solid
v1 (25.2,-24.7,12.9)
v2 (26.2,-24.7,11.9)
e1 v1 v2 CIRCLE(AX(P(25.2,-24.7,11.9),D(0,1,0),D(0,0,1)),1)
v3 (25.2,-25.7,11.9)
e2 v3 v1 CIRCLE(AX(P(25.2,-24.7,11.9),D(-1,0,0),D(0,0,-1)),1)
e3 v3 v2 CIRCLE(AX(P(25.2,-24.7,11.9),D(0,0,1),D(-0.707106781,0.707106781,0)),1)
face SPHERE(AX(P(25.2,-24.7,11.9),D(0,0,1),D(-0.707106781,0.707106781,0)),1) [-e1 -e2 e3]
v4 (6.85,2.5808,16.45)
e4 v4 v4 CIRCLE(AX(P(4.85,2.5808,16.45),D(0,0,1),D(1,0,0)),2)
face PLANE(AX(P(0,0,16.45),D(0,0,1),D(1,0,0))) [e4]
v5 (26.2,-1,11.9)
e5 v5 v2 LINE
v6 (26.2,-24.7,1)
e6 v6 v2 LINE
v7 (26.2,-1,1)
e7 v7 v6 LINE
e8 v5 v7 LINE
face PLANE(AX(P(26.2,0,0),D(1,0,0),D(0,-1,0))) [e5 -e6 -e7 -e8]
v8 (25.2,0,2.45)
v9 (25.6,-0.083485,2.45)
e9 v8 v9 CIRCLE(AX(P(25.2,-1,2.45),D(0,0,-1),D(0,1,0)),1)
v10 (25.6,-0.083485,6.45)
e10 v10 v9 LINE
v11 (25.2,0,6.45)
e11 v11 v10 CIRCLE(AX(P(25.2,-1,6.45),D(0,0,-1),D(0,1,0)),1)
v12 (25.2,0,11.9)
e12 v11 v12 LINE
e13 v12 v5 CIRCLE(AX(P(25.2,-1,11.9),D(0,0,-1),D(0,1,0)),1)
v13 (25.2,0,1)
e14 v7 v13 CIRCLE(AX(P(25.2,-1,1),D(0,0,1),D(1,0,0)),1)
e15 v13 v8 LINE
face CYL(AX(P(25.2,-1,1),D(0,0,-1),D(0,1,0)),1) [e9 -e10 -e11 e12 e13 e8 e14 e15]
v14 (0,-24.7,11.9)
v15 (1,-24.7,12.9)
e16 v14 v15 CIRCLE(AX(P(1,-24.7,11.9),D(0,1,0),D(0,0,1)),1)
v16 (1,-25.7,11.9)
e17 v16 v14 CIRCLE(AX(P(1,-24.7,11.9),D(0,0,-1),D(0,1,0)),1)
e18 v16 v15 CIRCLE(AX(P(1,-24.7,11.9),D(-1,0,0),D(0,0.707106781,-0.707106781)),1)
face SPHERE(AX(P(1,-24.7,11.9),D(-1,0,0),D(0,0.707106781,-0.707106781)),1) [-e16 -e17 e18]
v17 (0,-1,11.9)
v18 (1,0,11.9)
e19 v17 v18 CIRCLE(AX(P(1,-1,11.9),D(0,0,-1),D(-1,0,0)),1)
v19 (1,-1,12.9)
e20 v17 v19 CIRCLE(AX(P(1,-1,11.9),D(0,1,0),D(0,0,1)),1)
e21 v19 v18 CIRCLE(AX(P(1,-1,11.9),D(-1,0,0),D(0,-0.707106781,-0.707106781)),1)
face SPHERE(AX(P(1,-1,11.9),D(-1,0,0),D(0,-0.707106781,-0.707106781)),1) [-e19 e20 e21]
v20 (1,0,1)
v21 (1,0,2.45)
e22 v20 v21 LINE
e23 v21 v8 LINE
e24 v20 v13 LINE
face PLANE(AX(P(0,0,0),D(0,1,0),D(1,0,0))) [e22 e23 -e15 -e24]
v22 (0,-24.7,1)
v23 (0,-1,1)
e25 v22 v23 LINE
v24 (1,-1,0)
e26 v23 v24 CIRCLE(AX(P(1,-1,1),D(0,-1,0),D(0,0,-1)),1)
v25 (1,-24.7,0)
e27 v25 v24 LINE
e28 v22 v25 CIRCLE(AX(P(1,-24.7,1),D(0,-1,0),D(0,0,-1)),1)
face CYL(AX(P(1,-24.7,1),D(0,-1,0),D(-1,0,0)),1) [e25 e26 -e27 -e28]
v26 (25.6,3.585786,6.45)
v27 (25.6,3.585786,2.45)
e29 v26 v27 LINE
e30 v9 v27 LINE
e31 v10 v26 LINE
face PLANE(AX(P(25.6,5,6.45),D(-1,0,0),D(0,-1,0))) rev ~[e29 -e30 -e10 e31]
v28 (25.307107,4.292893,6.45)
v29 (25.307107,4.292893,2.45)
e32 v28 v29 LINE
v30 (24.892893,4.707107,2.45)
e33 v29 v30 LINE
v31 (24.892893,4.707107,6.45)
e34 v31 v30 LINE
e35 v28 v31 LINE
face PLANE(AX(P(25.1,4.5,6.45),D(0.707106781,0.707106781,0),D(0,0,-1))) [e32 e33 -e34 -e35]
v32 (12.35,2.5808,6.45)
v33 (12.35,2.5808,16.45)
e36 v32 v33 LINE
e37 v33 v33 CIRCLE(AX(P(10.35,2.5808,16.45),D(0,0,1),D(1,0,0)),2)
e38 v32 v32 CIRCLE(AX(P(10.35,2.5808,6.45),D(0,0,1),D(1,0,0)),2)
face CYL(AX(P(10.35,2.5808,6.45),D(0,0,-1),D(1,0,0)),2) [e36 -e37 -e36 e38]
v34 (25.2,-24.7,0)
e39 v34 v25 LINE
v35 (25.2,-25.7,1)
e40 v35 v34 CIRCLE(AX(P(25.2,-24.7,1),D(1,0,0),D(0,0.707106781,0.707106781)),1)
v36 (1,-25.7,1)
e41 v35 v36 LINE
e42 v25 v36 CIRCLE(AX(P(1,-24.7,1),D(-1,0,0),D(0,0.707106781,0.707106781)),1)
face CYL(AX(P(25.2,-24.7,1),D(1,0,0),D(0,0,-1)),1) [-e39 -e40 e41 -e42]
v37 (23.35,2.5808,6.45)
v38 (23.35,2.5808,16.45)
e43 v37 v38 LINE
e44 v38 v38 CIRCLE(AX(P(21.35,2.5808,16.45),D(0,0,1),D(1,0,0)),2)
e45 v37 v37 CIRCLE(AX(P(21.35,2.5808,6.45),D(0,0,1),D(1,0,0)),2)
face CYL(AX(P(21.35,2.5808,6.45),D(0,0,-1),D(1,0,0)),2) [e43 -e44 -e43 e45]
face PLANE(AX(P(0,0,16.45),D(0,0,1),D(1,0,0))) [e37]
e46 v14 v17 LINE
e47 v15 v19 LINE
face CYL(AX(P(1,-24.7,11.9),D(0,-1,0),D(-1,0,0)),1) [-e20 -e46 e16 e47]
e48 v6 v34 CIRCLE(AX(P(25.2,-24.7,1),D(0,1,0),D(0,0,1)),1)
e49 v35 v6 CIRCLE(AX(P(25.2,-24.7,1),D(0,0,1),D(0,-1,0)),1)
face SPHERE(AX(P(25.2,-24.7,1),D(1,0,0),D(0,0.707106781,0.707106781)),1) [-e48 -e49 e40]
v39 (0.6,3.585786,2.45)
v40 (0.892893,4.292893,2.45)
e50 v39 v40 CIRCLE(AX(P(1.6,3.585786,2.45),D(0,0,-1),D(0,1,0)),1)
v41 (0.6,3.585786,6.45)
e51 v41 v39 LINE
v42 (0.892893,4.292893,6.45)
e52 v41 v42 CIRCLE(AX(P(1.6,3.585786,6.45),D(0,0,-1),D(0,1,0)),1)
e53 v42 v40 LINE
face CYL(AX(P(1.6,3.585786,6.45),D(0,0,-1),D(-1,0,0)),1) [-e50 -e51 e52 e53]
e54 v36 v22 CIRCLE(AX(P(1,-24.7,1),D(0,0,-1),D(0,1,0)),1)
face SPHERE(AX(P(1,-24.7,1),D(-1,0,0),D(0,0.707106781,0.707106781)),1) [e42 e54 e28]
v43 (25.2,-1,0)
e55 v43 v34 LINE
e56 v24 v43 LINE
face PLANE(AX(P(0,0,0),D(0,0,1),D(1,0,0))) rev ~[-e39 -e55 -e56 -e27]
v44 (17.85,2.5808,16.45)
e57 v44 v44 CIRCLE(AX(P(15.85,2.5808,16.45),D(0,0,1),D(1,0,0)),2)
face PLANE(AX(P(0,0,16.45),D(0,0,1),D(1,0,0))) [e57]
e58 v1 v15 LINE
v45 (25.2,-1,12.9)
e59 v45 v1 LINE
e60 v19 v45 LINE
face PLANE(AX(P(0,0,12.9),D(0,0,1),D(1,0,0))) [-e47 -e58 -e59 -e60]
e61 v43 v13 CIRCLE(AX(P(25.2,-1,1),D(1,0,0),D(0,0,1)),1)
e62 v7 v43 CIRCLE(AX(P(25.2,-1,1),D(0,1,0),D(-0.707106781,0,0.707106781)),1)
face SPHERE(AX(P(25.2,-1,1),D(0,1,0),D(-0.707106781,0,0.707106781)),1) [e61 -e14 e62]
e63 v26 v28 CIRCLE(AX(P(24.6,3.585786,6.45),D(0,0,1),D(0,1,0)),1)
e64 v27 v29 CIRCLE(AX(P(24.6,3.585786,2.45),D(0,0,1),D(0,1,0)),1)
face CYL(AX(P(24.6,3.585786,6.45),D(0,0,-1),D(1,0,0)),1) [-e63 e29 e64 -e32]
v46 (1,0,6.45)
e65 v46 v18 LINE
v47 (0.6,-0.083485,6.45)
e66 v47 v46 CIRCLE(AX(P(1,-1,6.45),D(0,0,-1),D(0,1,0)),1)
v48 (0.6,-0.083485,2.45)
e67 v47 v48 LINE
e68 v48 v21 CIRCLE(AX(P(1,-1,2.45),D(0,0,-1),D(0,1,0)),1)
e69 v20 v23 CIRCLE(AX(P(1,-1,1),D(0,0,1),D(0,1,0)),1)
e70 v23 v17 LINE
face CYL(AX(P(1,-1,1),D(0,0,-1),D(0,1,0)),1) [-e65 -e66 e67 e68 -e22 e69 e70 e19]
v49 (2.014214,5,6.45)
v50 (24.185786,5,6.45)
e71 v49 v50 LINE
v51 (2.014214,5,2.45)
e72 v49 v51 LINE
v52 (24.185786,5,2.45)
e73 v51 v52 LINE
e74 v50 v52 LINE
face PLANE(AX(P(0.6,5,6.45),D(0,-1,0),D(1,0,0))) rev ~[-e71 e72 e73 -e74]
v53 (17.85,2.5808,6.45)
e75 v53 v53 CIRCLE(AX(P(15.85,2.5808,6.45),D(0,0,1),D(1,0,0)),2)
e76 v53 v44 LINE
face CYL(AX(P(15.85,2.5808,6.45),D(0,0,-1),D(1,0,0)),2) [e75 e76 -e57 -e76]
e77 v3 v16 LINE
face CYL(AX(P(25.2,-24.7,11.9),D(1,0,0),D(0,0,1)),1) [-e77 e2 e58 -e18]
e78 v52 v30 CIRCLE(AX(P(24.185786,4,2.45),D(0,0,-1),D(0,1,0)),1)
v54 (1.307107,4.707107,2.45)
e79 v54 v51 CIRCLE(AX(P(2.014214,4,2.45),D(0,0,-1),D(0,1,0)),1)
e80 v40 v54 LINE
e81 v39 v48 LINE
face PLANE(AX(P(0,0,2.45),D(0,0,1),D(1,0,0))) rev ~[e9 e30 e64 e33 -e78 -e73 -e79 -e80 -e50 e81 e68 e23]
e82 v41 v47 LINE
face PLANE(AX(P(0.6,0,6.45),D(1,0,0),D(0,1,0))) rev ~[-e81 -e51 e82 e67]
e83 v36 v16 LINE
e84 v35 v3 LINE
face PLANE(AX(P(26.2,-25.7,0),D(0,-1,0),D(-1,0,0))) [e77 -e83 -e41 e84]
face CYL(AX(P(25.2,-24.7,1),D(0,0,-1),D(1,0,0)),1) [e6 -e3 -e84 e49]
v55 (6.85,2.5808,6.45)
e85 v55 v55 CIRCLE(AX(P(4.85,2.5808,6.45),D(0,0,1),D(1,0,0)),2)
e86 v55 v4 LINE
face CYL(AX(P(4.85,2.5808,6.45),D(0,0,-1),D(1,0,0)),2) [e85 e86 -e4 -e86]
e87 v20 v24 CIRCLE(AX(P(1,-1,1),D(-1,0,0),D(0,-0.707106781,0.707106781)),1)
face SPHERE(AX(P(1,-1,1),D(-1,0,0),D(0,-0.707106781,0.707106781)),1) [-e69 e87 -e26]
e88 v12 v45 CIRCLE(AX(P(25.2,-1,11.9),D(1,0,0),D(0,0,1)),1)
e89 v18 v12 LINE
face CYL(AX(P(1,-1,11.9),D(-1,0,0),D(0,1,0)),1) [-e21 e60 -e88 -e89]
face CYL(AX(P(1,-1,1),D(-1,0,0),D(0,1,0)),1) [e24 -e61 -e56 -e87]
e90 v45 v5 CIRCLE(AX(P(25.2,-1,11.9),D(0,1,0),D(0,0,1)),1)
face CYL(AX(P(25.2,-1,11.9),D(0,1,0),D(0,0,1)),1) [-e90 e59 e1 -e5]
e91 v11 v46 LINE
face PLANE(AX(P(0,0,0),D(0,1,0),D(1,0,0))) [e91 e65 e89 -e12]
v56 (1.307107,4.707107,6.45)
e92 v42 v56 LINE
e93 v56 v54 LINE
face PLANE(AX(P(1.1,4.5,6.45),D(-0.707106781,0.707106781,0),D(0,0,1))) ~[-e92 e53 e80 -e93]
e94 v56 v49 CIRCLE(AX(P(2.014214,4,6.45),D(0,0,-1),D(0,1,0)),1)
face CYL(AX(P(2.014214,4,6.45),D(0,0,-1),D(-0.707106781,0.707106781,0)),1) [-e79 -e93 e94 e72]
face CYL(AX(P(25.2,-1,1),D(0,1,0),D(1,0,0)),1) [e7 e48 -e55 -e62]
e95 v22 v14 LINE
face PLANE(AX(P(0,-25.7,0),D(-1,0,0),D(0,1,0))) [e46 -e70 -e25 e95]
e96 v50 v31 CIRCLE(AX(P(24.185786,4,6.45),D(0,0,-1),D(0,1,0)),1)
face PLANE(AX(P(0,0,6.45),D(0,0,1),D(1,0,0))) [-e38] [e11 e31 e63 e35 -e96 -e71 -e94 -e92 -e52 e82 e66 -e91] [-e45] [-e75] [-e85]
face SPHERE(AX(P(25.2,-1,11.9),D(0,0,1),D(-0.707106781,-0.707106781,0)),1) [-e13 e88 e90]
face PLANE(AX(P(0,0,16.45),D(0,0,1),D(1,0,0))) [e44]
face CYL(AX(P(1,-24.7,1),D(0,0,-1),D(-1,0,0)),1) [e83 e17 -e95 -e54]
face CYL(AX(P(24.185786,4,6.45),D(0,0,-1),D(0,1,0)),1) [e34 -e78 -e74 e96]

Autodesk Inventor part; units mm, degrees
ref_plane "YZ Plane" through (0, 0, 0) normal (1, 0, 0) x (0, 1, 0)
ref_plane "XZ Plane" through (0, 0, 0) normal (0, 1, 0) x (-1, 0, 0)
sketch "スケッチ1" plane through (0, 0, 0) normal (0, 0, 1) x (1, 0, 0)
  line L0 (0, 0) -> (26.2, 0)
  line L1 (26.2, 0) -> (26.2, -25.7)
  line L2 (26.2, -25.7) -> (0, -25.7)
  line L3 (0, -25.7) -> (0, 0)
  dimension "d0" = 25.7
  dimension "d1" = 26.2
extrude "外形" add sketch "スケッチ1" along normal blind 12.9
ref_plane "作業平面1" through (0, 0, 6.45) normal (0, 0, 1) x (1, 0, 0)
sketch "スケッチ2" plane through (0, 0, 6.45) normal (0, 0, 1) x (1, 0, 0)
  line L0 (0, 0) -> (26.2, 0) projected
  line L1 (0, 0) -> (26.2, 0) projected
  line L2 (0.6, 0) -> (0.6, 5)
  line L3 (0.6, 5) -> (25.6, 5)
  line L4 (25.6, 5) -> (25.6, 0)
  line L5 (13.1, 0) -> (13.1, 3.4882)
  dimension "d5" = 5
  dimension "d6" = 25
extrude "突起部" add sketch "スケッチ2" against normal blind 4
chamfer "面取り1" distance 1 angle 45 2 edges at (0.6, 5, 4.45) (25.6, 5, 4.45)
fillet "フィレット1" radius 1 12 edges at (0, 0, 6.45) (0, -25.7, 6.45) (26.2, -25.7, 6.45) (13.1, -25.7, 12.9) (26.2, -12.85, 12.9) (26.2, -12.85, 0) (0, -12.85, 12.9) (13.1, 0, 12.9) (13.1, 0, 0) (13.1, -25.7, 0) (26.2, 0, 6.45) (0, -12.85, 0)
fillet "フィレット2" radius 1 4 edges at (25.6, 4, 4.45) (24.6, 5, 4.45) (1.6, 5, 4.45) (0.6, 4, 4.45)
sketch "スケッチ3" plane through (0, 0, 6.45) normal (0, 0, 1) x (1, 0, 0)
  arc A0 (2.0142, 5) -> (1.3071, 4.7071) centre (2.0142, 4) ccw projected
  line L0 (0.6, 4) -> (1.3071, 4.7071) projected
  line L1 (0.6, 4) -> (0.6, -0.0835) projected
  arc A1 (1, 0) -> (0.6, -0.0835) centre (1, -1) ccw projected
  line L2 (25.2, 0) -> (1, 0) projected
  arc A2 (25.6, -0.0835) -> (25.2, 0) centre (25.2, -1) ccw projected
  line L3 (25.6, -0.0835) -> (25.6, 3.5858) projected
  arc A3 (25.6, 3.5858) -> (25.3071, 4.2929) centre (24.6, 3.5858) ccw projected
  line L4 (24.8929, 4.7071) -> (25.3071, 4.2929) projected
  arc A4 (24.8929, 4.7071) -> (24.1858, 5) centre (24.1858, 4) ccw projected
  line L5 (24.1858, 5) -> (2.0142, 5) projected
  line L6 (4.85, 2.5808) -> (21.35, 2.5808)
  line L7 (13.1, 5) -> (13.1, 0.3828)
  point P0 (0, 0)
  point P1 (10.35, 2.5808)
  point P2 (15.85, 2.5808)
  dimension "d14" = 5.5
  dimension "d15" = 16.5
sketch "スケッチ4" plane through (0, 0, 6.45) normal (0, 0, 1) x (1, 0, 0)
  circle A0 centre (4.85, 2.5808) radius 2
  circle A1 centre (10.35, 2.5808) radius 2
  circle A2 centre (15.85, 2.5808) radius 2
  circle A3 centre (21.35, 2.5808) radius 2
  point P0 (0, 0)
  dimension "d16" = 4
  dimension "d17" = 4
  dimension "d18" = 4
  dimension "d19" = 4
extrude "押し出し3" add sketch "スケッチ4" along normal blind 10
equation "\"d14\" = 0.333333 * d15"
properties part number "市販回路_MC402CR" material "ABS Plastic"
